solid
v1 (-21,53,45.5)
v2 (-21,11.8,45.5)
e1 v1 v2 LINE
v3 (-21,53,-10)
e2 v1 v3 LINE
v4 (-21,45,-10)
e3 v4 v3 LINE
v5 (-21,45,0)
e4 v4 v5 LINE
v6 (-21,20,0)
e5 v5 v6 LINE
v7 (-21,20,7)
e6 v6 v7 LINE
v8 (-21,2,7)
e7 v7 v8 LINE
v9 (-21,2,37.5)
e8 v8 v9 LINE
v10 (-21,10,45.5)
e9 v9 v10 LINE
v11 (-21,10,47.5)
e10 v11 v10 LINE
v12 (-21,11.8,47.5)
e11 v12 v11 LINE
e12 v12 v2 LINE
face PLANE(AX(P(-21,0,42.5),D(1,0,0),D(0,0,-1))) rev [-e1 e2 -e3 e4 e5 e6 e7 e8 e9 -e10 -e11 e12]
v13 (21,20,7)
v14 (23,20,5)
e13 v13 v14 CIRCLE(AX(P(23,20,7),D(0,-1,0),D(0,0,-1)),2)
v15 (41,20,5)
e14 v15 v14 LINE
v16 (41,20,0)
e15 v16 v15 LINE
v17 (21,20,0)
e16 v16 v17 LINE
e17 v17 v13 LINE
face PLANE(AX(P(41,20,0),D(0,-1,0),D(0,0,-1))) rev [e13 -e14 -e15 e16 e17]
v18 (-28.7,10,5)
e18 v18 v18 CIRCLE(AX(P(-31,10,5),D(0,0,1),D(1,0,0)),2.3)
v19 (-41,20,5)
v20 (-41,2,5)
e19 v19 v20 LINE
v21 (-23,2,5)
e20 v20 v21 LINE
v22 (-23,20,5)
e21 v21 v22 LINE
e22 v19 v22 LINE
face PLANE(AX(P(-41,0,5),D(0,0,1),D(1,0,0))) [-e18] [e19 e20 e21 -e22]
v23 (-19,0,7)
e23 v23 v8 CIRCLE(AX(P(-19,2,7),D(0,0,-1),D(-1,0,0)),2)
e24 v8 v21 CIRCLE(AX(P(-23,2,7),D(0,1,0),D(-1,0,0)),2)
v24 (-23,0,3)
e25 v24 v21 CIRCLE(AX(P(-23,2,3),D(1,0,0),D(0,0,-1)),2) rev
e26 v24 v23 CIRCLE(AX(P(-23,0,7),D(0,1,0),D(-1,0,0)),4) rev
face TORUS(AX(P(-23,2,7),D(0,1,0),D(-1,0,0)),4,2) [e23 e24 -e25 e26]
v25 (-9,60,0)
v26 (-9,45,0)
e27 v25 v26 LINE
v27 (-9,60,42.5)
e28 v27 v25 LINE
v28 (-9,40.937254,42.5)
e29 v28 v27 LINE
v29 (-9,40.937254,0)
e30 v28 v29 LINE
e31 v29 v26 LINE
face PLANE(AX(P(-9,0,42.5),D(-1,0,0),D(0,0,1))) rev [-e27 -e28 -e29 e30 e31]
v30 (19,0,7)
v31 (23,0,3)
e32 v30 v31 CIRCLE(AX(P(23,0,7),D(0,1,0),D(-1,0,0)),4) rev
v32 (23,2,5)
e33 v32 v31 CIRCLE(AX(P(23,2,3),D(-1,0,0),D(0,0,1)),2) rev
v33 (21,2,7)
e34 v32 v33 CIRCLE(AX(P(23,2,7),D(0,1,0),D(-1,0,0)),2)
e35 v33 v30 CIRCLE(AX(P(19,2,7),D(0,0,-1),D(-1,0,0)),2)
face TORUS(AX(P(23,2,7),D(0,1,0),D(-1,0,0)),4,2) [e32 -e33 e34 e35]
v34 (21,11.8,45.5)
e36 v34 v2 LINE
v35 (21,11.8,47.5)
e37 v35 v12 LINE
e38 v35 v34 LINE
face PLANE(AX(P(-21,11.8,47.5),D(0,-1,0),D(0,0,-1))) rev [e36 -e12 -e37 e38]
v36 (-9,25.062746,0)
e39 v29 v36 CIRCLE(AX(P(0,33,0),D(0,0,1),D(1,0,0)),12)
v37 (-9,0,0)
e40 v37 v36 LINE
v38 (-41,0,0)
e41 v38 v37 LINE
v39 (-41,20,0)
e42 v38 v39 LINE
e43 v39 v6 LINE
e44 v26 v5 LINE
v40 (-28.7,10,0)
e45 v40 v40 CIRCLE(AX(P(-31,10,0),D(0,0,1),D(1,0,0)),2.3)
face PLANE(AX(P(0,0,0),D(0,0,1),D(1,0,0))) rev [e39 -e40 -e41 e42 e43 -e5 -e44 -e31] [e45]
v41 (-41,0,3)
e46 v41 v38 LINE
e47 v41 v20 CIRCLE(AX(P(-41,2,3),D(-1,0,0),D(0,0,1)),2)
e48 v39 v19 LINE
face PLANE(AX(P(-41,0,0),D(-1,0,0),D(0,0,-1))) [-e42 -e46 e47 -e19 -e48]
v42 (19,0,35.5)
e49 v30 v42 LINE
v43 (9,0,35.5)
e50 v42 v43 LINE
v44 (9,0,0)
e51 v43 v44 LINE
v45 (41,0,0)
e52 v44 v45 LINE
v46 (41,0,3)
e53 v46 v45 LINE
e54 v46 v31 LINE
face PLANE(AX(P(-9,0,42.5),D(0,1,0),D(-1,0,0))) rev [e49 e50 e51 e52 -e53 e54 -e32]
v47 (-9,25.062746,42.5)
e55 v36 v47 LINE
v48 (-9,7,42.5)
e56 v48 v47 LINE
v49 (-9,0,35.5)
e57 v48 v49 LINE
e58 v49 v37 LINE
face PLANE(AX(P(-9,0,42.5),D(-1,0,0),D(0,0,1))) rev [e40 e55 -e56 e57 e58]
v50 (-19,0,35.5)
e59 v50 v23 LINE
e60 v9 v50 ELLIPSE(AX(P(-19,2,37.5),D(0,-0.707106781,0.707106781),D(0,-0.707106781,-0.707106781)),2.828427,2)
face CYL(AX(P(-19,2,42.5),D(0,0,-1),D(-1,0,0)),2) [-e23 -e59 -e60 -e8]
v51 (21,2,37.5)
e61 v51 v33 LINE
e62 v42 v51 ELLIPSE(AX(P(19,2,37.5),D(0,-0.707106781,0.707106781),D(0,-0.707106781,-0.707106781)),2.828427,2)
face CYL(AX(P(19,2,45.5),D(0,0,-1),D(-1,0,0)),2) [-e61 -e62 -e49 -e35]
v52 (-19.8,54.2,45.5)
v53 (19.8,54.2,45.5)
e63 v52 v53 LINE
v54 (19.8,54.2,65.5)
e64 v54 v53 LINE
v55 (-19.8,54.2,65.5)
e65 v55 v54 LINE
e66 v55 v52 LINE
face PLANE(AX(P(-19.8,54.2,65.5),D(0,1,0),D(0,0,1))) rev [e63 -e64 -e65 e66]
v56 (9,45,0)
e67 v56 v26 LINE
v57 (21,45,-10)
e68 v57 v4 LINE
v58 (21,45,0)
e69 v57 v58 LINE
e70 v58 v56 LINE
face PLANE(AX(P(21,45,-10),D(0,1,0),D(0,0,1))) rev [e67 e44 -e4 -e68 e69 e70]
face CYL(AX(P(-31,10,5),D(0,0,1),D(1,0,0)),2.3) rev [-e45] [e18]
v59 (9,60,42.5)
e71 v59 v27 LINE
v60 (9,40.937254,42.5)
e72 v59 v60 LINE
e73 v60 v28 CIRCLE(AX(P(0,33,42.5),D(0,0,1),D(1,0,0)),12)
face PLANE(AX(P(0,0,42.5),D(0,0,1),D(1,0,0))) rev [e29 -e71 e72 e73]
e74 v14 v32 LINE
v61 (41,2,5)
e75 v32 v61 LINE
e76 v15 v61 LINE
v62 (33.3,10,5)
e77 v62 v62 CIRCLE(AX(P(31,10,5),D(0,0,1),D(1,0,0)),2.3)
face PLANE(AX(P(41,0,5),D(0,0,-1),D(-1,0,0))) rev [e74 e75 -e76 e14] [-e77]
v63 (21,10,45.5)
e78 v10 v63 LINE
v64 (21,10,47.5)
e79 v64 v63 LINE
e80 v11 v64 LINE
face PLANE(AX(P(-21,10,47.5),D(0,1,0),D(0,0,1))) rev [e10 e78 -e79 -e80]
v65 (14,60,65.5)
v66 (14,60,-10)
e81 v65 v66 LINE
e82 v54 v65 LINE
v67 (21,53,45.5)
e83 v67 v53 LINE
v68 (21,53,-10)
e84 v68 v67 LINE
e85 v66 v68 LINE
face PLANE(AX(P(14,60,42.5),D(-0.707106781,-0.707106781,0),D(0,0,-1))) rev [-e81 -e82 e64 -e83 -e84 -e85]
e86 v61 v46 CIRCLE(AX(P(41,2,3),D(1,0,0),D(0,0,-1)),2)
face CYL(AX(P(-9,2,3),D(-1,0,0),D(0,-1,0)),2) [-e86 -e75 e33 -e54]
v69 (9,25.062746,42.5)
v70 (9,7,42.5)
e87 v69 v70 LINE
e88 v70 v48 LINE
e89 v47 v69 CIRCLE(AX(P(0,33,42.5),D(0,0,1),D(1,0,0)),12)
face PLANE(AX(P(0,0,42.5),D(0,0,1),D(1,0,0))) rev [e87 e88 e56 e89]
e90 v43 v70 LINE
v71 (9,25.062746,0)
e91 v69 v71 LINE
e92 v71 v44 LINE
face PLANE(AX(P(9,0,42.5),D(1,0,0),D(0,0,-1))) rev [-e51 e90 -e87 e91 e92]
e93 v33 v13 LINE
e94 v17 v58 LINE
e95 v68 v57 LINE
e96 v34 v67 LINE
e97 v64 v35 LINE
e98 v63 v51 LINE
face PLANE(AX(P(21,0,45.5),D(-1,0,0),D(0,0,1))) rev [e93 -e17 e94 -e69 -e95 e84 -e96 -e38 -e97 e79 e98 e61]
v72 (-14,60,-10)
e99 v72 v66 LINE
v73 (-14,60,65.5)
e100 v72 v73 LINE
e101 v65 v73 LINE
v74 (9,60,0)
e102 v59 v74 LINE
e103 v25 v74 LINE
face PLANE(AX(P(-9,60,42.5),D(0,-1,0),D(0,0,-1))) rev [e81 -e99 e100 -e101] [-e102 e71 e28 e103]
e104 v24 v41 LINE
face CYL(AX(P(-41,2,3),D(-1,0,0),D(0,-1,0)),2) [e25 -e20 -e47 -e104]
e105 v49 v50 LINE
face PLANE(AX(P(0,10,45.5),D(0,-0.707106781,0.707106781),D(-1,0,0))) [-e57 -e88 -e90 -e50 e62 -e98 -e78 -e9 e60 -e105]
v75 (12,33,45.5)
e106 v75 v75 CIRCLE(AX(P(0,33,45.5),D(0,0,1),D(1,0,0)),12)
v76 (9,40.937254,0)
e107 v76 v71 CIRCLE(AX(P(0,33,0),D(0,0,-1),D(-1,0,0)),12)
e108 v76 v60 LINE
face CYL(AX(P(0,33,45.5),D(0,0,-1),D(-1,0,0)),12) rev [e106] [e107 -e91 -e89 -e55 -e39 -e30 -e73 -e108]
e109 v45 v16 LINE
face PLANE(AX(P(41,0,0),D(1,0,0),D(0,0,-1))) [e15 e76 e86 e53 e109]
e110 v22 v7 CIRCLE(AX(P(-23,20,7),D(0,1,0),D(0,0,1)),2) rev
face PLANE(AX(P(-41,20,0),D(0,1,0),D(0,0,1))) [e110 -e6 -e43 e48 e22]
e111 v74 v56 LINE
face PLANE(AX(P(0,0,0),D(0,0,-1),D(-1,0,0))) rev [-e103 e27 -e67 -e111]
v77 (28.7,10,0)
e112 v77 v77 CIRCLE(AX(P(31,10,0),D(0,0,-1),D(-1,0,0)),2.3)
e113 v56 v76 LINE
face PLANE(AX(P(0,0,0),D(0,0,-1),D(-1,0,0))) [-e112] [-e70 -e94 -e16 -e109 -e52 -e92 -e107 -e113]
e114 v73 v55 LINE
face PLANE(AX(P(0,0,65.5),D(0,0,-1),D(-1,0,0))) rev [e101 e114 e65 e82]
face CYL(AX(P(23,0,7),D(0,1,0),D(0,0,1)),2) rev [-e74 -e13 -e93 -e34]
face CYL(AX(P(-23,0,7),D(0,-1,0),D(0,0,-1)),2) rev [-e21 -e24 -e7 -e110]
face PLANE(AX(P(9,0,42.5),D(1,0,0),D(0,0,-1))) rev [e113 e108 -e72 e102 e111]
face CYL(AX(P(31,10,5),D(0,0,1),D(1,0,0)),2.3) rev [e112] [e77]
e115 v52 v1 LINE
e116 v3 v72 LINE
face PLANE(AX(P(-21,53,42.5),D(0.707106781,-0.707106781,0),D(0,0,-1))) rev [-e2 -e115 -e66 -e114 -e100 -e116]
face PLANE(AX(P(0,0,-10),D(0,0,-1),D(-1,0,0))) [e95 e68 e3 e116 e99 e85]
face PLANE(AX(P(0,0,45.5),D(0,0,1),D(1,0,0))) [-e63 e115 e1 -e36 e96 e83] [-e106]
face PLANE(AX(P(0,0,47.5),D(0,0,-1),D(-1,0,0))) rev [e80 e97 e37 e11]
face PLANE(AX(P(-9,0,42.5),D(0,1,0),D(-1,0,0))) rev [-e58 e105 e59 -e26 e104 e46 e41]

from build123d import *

# Parameters (mm, degrees)
SKETCH_1_W          = 12
SKETCH_1_H          = 60
EXTRUDE_1_DEPTH     = 42.5
EXTRUDE_1_2_DEPTH   = 42.5
SKETCH_2_W          = 42
SKETCH_2_H          = 60
SKETCH_2_R          = 12
EXTRUDE_2_DEPTH     = 3
SKETCH_3_R          = 12
CUT_EXTRUDE_1_DEPTH = 79.174484328
SKETCH_4_W          = 42
SKETCH_4_H          = 15
EXTRUDE_3_DEPTH     = 10
CHAMFER_1_SIZE      = 10
SKETCH_5_W          = 5
SKETCH_5_H          = 20
EXTRUDE_4_DEPTH     = 20
HOLE_WIZARD_M4_1_D  = 4.6
FILLET_1_R          = 2
CHAMFER_2_SIZE      = 7
EXTRUDE_5_DEPTH     = 20
SKETCH_9_W          = 42
SKETCH_9_H          = 1.8
EXTRUDE_6_DEPTH     = 2


with BuildPart() as part:
    # 스케치1 → 보스-돌출1 (new body)
    with BuildSketch(Plane.XY):
        with Locations((-15, 30)):
            Rectangle(SKETCH_1_W, SKETCH_1_H)
    extrude(amount=EXTRUDE_1_DEPTH)



with BuildPart() as body_2:
    # 스케치1 → Extrude 1 2 (new body)
    with BuildSketch(Plane.XY):
        with Locations((15, 30)):
            Rectangle(SKETCH_1_W, SKETCH_1_H)
    extrude(amount=EXTRUDE_1_2_DEPTH)


with BuildPart() as part_1:
    add(part.part)

    add(body_2.part)  # 보스-돌출2 merges body 2
    # 스케치2 → 보스-돌출2 (add)
    with BuildSketch(Plane.XY.offset(42.5)):
        with Locations((0, 30)):
            Rectangle(SKETCH_2_W, SKETCH_2_H)
        with Locations(Location((0, 33, 0), (0, 0, 138.590377891))):
            Circle(SKETCH_2_R, mode=Mode.SUBTRACT)
    extrude(amount=EXTRUDE_2_DEPTH)

    # 스케치3 → 컷-돌출1 (cut, through all)
    with BuildSketch(Plane.XY.offset(45.5)):
        with Locations(Location((0, 33, 0), (0, 0, 138.590377891))):
            Circle(SKETCH_3_R)
    extrude(amount=-CUT_EXTRUDE_1_DEPTH, mode=Mode.SUBTRACT)

    # 스케치4 → 보스-돌출3 (add)
    with BuildSketch(Plane(origin=(0, 0, 0), x_dir=(-1, 0, 0), z_dir=(0, 0, -1))):
        with Locations((0, 52.5)):
            Rectangle(SKETCH_4_W, SKETCH_4_H)
    extrude(amount=EXTRUDE_3_DEPTH)

    # 모따기1
    # the kernel refuses this chamfer: 10 mm, written as the material it takes off along each edge
    with BuildSketch(Plane(origin=(46.71682988, 0, 45.5), x_dir=(0, -0.02749587661058638, -0.9996219169112968), z_dir=(-1, 0, 0))) as chamfer_1_piece_1:
        Polygon((CHAMFER_1_SIZE * 0.999621916911, -CHAMFER_1_SIZE * 0.0274958766106), (-CHAMFER_1_SIZE * 0.0274958766106, -CHAMFER_1_SIZE * 0.999621916911), (0, 0), align=None)
    extrude(amount=93.433659759, mode=Mode.SUBTRACT)

    # 스케치5 → 보스-돌출4 (add)
    with BuildSketch(Plane(origin=(21, 0, 0), x_dir=(0, 0, -1), z_dir=(1, 0, 0))):
        with Locations((-2.5, 10)):
            Rectangle(SKETCH_5_W, SKETCH_5_H)
    extrude_4 = extrude(amount=EXTRUDE_4_DEPTH)

    # M4 여유 구멍1 (through all)
    with Locations(Plane.XY.offset(5)):
        with Locations((31, 10)):
            hole_wizard_m4_1 = Hole(HOLE_WIZARD_M4_1_D / 2)

    # 대칭 복사1: 보스-돌출4, M4 여유 구멍1 across plane
    add(extrude_4.mirror(Plane(origin=(0, 0, 0), x_dir=(0, 0, 1), z_dir=(1, 0, 0))))
    add(hole_wizard_m4_1.mirror(Plane(origin=(0, 0, 0), x_dir=(0, 0, 1), z_dir=(1, 0, 0))), mode=Mode.SUBTRACT)

    # 필렛1
    fillet_1_edges = [part_1.edges().sort_by_distance(p)[0] for p in [
        (21, 0, 20.25),
        (-21, 0, 20.25),
        (21, 10, 5),
        (31, 0, 5),
        (-31, 0, 5),
        (-21, 10, 5),
    ]]
    fillet(fillet_1_edges, radius=FILLET_1_R)

    # 모따기2
    chamfer_2_edges = [part_1.edges().sort_by_distance(p)[0] for p in [
        (21, 60, 17.75),
        (-21, 60, 17.75),
    ]]
    chamfer(chamfer_2_edges, length=CHAMFER_2_SIZE)

    # 스케치8 → 보스-돌출5 (add)
    with BuildSketch(Plane.XY.offset(45.5)):
        Polygon((-19.8, 54.2), (19.8, 54.2), (14, 60), (-14, 60), align=None)
    extrude(amount=EXTRUDE_5_DEPTH)

    # 스케치9 → 보스-돌출6 (add)
    with BuildSketch(Plane.XY.offset(45.5)):
        with Locations((0, 10.9)):
            Rectangle(SKETCH_9_W, SKETCH_9_H)
    extrude(amount=EXTRUDE_6_DEPTH)


solid = part_1.part
